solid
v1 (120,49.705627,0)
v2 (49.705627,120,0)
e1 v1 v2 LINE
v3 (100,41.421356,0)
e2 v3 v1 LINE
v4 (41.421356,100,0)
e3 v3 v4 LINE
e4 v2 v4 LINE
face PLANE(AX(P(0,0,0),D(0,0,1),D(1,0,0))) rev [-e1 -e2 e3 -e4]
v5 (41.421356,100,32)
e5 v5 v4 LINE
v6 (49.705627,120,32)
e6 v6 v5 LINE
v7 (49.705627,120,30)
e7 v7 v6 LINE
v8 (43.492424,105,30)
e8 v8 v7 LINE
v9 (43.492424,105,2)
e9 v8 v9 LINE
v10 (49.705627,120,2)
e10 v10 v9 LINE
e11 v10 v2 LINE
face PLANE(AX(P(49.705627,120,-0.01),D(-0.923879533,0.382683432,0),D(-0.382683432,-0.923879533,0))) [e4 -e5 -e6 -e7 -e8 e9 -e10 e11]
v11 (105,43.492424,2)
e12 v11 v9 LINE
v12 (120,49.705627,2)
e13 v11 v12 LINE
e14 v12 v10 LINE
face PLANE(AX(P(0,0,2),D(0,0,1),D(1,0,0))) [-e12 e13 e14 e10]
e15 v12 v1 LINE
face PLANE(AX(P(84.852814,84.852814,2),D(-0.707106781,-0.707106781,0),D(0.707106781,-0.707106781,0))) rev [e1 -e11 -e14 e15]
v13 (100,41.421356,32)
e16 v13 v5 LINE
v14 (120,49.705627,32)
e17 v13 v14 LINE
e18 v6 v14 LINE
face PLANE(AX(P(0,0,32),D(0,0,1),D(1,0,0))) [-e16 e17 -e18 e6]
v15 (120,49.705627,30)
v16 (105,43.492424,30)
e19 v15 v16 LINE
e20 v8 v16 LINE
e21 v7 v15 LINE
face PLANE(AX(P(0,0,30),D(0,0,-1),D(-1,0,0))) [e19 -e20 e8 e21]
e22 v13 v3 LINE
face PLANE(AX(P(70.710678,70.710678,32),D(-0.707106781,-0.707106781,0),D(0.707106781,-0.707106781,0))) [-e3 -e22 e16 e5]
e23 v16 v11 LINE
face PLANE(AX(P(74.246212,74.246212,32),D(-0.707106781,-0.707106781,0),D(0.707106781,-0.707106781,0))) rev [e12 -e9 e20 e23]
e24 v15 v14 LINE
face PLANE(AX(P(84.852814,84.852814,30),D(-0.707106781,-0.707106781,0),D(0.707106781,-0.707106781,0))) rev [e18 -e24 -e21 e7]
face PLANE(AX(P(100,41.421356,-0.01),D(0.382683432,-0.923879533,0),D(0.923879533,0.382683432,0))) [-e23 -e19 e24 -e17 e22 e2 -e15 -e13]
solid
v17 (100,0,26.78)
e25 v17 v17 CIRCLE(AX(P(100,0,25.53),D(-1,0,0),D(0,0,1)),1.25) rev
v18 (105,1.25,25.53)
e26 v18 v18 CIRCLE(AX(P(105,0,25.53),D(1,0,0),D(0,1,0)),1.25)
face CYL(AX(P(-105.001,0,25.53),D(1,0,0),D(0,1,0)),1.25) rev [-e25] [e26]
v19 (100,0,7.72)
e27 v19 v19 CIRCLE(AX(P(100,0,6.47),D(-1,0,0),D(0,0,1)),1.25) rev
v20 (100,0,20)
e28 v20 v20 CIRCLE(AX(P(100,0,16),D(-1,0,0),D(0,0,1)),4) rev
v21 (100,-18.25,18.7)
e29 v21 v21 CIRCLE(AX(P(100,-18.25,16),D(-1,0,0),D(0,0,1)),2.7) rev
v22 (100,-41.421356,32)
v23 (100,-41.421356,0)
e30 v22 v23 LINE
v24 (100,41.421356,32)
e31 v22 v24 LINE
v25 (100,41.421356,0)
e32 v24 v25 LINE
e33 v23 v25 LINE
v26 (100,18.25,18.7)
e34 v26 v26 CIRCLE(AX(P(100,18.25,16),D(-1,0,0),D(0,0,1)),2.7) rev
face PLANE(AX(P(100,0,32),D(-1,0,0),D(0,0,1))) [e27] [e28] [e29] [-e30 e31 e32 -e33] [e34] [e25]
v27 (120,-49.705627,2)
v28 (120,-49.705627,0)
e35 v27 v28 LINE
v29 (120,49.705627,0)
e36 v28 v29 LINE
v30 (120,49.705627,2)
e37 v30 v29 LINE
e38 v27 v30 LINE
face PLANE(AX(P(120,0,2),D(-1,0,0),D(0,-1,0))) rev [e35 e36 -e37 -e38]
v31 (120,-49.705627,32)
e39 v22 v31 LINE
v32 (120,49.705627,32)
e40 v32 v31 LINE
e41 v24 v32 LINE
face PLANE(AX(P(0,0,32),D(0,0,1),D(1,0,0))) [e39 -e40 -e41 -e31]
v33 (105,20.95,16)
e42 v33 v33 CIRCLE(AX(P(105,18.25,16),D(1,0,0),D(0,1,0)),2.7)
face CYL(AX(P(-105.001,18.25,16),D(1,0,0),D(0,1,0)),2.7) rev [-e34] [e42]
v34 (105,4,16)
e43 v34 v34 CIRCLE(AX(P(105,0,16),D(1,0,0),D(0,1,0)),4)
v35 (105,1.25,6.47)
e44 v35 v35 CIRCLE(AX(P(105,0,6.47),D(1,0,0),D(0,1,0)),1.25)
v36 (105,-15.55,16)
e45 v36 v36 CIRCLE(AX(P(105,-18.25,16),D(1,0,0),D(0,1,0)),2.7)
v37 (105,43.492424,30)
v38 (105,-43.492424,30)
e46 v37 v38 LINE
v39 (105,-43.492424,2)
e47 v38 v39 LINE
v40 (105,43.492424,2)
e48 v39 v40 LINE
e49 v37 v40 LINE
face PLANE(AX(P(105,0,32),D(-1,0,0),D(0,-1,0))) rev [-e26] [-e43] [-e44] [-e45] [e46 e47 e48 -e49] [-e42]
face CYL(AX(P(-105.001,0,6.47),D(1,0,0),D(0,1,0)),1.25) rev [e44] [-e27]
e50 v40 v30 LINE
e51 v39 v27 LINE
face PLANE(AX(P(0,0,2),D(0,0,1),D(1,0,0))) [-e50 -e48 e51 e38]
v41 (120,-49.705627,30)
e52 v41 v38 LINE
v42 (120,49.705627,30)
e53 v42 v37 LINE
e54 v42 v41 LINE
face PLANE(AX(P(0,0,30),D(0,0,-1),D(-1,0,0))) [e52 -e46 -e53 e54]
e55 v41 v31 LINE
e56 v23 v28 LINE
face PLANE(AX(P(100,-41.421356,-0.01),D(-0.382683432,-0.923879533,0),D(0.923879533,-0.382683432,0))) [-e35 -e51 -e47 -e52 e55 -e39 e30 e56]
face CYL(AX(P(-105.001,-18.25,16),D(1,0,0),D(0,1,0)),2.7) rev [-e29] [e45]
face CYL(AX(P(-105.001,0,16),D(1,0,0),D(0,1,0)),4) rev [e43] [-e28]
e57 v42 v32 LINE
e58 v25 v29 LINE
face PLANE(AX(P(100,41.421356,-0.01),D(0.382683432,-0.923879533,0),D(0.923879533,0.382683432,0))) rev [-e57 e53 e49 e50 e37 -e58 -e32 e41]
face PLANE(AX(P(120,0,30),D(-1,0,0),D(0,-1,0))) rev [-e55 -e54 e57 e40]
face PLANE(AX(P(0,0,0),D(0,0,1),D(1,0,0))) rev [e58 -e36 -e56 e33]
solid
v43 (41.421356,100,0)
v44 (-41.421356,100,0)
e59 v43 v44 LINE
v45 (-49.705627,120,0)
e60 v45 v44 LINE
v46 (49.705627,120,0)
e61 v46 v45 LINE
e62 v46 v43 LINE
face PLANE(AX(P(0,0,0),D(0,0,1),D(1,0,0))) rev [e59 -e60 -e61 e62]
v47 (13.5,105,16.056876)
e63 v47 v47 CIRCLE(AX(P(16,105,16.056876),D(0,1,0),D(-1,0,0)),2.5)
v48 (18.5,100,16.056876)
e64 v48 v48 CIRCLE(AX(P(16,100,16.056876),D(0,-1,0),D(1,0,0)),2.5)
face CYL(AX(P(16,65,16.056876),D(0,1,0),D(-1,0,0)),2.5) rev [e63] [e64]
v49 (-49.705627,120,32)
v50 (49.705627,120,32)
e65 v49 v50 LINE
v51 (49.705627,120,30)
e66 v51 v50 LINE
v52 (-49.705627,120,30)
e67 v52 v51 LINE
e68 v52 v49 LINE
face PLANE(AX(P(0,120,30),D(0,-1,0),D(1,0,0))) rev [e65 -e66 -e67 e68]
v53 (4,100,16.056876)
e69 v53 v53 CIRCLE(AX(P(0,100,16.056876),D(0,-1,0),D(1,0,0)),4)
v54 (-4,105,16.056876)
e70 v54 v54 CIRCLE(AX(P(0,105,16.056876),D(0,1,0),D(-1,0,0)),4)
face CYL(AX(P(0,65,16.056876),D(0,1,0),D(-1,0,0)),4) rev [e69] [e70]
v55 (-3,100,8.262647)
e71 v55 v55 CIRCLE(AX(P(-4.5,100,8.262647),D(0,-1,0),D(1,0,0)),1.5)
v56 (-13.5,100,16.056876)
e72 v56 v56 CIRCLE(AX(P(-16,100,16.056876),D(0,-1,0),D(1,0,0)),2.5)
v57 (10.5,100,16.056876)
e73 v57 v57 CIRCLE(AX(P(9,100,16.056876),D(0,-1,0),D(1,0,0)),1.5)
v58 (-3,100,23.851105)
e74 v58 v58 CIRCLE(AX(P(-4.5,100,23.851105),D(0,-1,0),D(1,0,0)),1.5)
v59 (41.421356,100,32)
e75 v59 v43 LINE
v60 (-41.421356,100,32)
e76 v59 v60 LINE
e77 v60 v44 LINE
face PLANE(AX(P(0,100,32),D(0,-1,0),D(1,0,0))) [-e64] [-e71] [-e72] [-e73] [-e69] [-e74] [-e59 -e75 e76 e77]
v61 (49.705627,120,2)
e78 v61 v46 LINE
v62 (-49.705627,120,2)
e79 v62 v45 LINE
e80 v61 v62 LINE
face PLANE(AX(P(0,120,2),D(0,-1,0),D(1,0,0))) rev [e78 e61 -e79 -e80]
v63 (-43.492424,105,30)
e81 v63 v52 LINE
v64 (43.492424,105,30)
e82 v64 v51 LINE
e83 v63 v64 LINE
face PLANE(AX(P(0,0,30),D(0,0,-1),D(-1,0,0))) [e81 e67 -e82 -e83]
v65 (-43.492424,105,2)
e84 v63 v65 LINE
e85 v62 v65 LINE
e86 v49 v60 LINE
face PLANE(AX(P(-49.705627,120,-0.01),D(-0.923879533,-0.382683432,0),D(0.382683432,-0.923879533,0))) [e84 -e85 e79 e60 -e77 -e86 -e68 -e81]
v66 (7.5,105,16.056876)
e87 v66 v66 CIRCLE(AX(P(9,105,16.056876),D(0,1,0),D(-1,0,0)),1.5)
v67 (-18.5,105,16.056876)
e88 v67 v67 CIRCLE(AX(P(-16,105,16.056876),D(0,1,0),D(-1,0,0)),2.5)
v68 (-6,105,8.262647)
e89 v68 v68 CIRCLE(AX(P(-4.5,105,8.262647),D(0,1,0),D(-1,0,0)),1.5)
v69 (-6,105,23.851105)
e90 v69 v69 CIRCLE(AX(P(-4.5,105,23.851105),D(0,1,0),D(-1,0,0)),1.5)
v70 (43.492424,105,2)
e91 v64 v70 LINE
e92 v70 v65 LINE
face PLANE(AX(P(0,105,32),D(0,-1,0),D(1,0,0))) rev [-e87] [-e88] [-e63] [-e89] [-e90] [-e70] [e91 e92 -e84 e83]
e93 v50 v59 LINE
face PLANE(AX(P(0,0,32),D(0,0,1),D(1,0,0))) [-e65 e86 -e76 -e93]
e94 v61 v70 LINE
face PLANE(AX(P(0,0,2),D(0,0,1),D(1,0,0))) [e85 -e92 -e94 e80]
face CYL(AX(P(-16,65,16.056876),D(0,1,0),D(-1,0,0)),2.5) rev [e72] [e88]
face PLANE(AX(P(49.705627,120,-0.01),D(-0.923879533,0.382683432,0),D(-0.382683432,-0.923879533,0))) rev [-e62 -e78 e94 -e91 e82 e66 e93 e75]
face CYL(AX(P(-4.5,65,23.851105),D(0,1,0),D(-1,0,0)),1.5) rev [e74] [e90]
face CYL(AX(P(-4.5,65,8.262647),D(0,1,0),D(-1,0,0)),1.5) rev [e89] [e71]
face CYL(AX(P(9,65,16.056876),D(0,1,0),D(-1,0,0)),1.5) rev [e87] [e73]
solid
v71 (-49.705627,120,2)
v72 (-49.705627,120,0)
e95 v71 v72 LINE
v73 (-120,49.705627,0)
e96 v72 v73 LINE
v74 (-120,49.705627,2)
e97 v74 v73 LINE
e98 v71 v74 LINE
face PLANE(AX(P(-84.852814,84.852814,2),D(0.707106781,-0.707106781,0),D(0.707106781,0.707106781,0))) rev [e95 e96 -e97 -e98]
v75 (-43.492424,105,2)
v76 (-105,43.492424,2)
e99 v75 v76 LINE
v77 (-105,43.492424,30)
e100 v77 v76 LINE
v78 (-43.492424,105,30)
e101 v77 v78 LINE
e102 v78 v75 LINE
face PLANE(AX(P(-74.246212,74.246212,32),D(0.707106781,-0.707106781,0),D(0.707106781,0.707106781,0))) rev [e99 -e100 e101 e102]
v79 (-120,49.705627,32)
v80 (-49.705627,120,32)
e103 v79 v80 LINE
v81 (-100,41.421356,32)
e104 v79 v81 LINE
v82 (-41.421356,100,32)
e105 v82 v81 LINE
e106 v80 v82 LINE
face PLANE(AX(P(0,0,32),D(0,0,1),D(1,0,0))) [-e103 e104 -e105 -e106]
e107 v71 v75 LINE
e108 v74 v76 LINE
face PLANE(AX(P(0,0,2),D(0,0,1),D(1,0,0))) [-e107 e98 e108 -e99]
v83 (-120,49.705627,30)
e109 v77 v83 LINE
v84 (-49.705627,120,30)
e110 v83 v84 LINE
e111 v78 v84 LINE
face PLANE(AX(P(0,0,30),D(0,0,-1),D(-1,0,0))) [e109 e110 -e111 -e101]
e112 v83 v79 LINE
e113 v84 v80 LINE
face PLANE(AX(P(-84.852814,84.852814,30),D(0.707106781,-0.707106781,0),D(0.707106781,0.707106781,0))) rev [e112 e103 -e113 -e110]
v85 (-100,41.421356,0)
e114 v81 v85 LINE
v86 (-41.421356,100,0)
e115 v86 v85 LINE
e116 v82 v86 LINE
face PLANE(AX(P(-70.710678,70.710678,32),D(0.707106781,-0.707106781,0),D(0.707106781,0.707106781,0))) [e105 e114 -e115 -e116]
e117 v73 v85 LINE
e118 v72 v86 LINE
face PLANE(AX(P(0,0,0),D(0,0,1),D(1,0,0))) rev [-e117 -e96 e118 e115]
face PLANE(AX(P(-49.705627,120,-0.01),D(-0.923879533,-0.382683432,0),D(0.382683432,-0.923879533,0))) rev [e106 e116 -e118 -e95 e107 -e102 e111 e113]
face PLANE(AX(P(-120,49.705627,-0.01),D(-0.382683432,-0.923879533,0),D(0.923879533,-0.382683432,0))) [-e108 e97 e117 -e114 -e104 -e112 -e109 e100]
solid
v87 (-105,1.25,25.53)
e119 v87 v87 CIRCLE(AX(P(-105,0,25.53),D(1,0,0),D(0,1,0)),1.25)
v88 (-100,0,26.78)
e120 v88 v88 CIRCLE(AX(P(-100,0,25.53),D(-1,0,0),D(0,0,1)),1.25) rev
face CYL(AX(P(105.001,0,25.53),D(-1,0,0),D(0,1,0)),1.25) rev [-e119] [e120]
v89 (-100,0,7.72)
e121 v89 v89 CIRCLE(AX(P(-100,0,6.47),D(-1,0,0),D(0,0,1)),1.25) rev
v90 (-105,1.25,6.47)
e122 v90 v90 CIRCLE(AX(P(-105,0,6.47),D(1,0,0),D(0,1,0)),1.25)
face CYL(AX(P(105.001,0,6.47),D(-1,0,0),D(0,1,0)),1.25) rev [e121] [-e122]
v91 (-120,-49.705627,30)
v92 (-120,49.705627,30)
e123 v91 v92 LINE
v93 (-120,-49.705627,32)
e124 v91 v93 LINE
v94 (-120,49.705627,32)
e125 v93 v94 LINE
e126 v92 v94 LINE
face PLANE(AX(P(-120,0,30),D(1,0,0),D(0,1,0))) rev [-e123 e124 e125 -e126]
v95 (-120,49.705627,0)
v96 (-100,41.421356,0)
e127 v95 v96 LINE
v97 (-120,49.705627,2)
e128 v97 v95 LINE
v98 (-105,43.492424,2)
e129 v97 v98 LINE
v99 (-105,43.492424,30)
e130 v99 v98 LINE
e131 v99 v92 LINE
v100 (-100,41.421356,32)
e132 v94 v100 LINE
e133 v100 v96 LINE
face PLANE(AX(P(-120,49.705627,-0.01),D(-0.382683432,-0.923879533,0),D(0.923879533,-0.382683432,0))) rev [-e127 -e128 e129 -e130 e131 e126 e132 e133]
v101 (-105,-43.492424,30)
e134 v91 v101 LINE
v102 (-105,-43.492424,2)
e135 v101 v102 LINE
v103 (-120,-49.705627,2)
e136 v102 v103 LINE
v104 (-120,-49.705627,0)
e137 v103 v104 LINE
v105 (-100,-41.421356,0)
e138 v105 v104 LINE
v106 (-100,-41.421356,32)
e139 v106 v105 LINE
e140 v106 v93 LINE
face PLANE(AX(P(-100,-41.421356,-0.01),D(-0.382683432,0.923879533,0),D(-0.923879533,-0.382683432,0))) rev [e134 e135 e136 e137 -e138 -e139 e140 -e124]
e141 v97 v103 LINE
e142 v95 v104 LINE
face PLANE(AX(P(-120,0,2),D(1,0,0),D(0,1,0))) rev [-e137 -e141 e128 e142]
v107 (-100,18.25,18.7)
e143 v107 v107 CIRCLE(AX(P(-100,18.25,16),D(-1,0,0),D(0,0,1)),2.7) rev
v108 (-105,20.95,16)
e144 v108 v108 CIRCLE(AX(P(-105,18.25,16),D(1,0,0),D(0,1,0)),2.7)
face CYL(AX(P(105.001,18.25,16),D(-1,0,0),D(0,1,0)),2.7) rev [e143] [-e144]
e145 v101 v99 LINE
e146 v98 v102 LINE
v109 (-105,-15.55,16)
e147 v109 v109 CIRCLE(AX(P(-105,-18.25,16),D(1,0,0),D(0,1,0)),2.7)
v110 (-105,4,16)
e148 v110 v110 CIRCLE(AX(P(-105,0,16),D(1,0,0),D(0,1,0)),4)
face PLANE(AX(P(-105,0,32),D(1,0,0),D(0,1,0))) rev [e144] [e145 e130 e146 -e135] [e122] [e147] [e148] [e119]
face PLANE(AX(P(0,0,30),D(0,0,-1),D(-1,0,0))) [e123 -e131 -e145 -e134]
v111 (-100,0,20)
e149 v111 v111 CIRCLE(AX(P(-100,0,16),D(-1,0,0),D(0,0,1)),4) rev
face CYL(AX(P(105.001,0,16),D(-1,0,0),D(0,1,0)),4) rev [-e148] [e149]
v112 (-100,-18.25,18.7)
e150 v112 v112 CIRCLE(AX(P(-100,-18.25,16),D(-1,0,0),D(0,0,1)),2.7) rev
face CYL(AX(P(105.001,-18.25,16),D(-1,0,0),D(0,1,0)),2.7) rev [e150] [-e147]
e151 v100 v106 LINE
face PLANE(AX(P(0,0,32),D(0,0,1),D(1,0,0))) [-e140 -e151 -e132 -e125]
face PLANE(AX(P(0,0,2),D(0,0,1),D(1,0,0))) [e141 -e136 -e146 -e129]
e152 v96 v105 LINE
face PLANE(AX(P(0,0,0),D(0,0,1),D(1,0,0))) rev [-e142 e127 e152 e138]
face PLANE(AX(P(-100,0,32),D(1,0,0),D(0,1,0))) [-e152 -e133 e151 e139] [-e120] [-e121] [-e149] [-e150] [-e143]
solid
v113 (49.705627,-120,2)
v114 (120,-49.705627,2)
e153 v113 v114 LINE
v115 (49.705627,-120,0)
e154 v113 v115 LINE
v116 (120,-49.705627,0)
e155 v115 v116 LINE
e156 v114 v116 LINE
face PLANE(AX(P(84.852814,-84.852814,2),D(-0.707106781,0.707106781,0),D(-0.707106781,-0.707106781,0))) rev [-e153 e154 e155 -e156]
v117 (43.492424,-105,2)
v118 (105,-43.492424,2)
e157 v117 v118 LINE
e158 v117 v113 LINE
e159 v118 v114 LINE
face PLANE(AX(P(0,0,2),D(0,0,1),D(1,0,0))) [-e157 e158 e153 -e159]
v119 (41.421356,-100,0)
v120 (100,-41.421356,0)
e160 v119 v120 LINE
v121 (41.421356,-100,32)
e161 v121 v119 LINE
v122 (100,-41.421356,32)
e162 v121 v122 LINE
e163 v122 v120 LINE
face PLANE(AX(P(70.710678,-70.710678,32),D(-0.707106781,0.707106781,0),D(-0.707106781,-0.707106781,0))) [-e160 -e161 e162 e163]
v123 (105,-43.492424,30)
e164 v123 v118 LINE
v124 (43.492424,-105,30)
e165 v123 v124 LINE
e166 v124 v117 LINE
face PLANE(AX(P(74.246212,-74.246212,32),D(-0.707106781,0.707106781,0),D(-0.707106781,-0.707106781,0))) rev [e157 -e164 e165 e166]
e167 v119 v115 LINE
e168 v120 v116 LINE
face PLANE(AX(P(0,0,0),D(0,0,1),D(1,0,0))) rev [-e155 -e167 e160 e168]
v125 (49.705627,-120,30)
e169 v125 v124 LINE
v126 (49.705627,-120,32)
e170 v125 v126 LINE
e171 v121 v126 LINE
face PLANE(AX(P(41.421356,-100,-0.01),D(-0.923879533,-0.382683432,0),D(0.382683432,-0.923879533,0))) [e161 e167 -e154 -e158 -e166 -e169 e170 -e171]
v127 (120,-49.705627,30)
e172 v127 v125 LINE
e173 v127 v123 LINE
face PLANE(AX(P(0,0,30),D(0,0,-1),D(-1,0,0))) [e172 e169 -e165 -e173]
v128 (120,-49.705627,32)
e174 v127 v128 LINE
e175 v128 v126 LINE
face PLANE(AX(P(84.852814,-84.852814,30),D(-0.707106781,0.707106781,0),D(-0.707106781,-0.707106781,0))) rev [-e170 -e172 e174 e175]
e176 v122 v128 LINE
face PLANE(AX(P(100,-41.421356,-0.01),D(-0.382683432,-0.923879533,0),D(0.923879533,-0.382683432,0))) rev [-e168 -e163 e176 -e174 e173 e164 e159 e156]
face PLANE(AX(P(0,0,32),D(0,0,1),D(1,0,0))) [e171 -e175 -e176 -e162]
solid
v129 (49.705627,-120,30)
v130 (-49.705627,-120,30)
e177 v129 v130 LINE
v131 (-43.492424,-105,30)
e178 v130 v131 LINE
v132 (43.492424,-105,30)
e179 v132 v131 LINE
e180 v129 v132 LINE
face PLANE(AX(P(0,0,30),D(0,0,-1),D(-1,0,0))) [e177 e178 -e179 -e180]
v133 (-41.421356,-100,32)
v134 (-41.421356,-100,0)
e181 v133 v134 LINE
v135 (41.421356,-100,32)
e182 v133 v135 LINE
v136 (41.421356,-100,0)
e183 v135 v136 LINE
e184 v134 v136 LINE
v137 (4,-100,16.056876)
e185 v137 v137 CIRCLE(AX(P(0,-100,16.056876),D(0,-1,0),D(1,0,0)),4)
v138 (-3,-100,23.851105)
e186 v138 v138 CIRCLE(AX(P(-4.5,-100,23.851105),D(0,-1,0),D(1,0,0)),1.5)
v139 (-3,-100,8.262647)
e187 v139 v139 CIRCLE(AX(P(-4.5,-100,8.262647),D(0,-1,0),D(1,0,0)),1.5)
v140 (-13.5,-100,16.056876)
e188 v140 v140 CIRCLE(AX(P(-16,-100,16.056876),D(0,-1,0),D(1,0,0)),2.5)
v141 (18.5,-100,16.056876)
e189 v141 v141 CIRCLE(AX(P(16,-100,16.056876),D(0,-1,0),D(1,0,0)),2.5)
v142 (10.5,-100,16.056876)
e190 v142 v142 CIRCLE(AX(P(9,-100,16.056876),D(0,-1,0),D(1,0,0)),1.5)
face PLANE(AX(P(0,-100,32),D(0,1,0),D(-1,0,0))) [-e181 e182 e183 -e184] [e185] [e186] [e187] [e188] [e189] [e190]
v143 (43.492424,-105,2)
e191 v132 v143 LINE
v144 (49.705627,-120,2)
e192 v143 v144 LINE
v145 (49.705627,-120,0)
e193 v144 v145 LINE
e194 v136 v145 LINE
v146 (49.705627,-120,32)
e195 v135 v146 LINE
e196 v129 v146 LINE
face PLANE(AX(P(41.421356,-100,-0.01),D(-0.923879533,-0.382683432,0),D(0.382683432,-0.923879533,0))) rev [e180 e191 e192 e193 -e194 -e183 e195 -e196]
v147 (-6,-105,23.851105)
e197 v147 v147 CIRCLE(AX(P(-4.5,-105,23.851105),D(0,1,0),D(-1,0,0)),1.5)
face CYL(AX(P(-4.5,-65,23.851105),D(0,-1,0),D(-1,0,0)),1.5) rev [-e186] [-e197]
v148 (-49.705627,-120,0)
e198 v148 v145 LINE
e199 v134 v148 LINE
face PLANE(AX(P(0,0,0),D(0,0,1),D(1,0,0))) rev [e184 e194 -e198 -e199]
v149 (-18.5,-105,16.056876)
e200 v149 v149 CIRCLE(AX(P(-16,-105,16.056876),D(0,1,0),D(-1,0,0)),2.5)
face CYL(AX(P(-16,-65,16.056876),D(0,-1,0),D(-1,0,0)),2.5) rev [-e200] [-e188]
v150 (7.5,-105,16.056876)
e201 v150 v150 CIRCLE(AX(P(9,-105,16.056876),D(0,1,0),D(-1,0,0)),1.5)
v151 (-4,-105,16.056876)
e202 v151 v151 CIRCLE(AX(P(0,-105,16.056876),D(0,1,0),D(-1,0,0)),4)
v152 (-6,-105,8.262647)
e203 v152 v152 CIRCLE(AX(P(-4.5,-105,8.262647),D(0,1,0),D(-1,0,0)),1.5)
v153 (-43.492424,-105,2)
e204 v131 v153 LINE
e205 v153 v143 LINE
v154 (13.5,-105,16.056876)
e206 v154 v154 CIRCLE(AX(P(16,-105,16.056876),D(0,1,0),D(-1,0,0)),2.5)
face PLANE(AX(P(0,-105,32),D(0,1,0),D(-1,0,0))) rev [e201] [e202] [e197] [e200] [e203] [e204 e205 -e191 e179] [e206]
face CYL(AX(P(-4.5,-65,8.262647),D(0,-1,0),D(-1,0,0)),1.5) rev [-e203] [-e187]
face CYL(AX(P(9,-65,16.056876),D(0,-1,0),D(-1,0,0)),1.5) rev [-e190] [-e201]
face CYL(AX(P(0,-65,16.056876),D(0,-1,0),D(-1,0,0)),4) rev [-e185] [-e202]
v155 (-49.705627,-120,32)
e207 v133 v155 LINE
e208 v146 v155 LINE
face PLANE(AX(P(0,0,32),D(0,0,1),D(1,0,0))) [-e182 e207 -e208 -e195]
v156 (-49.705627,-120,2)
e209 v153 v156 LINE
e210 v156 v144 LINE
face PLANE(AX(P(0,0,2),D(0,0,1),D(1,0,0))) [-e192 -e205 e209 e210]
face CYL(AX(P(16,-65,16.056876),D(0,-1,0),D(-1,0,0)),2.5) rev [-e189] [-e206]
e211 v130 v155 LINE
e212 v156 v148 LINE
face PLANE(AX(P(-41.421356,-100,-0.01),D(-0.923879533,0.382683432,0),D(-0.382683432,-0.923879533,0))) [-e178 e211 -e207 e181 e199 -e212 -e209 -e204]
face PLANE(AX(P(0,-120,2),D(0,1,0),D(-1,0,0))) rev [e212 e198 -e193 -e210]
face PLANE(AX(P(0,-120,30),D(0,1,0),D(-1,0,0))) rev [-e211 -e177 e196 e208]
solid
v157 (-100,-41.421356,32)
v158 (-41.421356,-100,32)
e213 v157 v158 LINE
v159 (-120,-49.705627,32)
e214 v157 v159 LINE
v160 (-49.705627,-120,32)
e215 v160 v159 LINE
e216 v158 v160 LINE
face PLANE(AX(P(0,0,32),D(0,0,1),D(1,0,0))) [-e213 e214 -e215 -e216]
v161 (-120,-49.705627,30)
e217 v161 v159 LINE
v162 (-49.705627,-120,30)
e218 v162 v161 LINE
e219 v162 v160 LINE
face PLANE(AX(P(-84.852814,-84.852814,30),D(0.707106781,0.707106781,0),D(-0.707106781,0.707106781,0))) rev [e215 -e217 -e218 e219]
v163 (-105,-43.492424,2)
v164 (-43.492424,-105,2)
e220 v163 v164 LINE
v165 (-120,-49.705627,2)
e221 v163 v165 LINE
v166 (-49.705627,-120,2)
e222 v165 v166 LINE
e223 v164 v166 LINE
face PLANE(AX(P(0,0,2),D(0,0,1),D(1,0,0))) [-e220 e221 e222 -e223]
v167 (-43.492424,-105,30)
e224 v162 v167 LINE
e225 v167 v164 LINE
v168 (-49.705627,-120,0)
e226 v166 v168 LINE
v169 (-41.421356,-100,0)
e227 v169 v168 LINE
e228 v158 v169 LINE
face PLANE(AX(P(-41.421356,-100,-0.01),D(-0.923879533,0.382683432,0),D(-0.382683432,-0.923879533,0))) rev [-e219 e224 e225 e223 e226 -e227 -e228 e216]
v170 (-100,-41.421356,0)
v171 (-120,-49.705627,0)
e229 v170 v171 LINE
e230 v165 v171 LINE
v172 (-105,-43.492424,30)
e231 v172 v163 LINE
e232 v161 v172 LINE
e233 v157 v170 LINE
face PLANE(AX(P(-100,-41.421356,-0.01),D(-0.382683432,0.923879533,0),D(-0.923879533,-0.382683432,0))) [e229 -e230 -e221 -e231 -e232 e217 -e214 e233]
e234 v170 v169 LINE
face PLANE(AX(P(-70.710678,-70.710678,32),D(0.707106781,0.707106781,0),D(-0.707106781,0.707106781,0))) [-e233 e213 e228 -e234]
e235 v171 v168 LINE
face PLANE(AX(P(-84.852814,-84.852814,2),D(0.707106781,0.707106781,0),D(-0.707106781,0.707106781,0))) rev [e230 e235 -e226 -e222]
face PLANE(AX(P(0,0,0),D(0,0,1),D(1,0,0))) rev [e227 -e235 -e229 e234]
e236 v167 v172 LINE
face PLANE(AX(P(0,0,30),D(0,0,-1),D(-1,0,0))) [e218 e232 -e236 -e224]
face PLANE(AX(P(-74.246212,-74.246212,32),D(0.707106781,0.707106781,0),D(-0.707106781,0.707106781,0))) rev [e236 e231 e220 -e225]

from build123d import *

# Parameters (mm, degrees)
RESSALTO_EXTRUS_O1_DEPTH = 32
CORTE_EXTRUS_O1_REACH    = 238.958
ESBO_O2_R                = 4
ESBO_O2_R_2              = 2.7
ESBO_O2_R_3              = 1.25
ESBO_O4_R                = 4
ESBO_O4_R_2              = 1.5
ESBO_O4_R_3              = 2.5
CORTE_EXTRUS_O8_DEPTH    = 40
RESSALTO_EXTRUS_O2_DEPTH = 2
RESSALTO_EXTRUS_O3_START = 32
RESSALTO_EXTRUS_O3_DEPTH = 2
DIVIDIR1_DEPTH           = 32
DIVIDIR1_2_DEPTH         = 2
DIVIDIR1_START           = 30
DIVIDIR1_3_DEPTH         = 2
DIVIDIR1_4_DEPTH         = 32
DIVIDIR1_5_DEPTH         = 32
DIVIDIR1_6_DEPTH         = 2
DIVIDIR1_7_DEPTH         = 2
DIVIDIR1_8_DEPTH         = 32
DIVIDIR1_9_DEPTH         = 2
DIVIDIR1_10_DEPTH        = 2
DIVIDIR1_START_2         = -105
DIVIDIR1_11_OUTLINE_R    = 2.5
DIVIDIR1_11_OUTLINE_R_2  = 4
DIVIDIR1_11_OUTLINE_R_3  = 1.5
DIVIDIR1_11_DEPTH        = 5
DIVIDIR1_12_DEPTH        = 32
DIVIDIR1_13_DEPTH        = 2
DIVIDIR1_14_DEPTH        = 2
DIVIDIR1_15_DEPTH        = 32
DIVIDIR1_16_DEPTH        = 2
DIVIDIR1_17_DEPTH        = 2
DIVIDIR1_START_3         = 100
DIVIDIR1_18_OUTLINE_R    = 2.7
DIVIDIR1_18_OUTLINE_R_2  = 1.25
DIVIDIR1_18_OUTLINE_R_3  = 4
DIVIDIR1_18_DEPTH        = 5
DIVIDIR1_19_DEPTH        = 32
DIVIDIR1_20_DEPTH        = 2
DIVIDIR1_21_DEPTH        = 2
DIVIDIR1_22_OUTLINE_R    = 4
DIVIDIR1_22_OUTLINE_R_2  = 2.5
DIVIDIR1_22_OUTLINE_R_3  = 1.5
DIVIDIR1_22_DEPTH        = 5
DIVIDIR1_23_DEPTH        = 32
DIVIDIR1_24_DEPTH        = 2
DIVIDIR1_25_DEPTH        = 2


with BuildPart() as part:
    # Esboço1 → Ressalto-extrusão1 (new body)
    with BuildSketch(Plane.XY):
        Polygon((43.492424049, -105), (105, -43.492424049), (105, 43.492424049), (43.492424049, 105), (-43.492424049, 105), (-105, 43.492424049), (-105, -43.492424049), (-43.492424049, -105), align=None)
        Polygon((100, -41.421356237), (100, 41.421356237), (41.421356237, 100), (-41.421356237, 100), (-100, 41.421356237), (-100, -41.421356237), (-41.421356237, -100), (41.421356237, -100), align=None, mode=Mode.SUBTRACT)
    extrude(amount=RESSALTO_EXTRUS_O1_DEPTH)

    # Esboço2 → Corte-extrusão1 (cut, up to next)
    with BuildSketch(Plane(origin=(105, 0, 0), x_dir=(0, 0, -1), z_dir=(1, 0, 0)), mode=Mode.PRIVATE) as corte_extrus_o1_sk1:
        with Locations(Location((-16, 0, 0), (0, 0, 90))):
            Circle(ESBO_O2_R)
    corte_extrus_o1_tool1 = extrude(corte_extrus_o1_sk1.sketch, amount=-CORTE_EXTRUS_O1_REACH, mode=Mode.PRIVATE) & part.part
    # Esboço2 → Corte-extrusão1 (cut, up to next)
    with BuildSketch(Plane(origin=(105, 0, 0), x_dir=(0, 0, -1), z_dir=(1, 0, 0)), mode=Mode.PRIVATE) as corte_extrus_o1_sk2:
        with Locations(Location((-16, 18.25, 0), (0, 0, 90))):
            Circle(ESBO_O2_R_2)
    corte_extrus_o1_tool2 = extrude(corte_extrus_o1_sk2.sketch, amount=-CORTE_EXTRUS_O1_REACH, mode=Mode.PRIVATE) & part.part
    # Esboço2 → Corte-extrusão1 (cut, up to next)
    with BuildSketch(Plane(origin=(105, 0, 0), x_dir=(0, 0, -1), z_dir=(1, 0, 0)), mode=Mode.PRIVATE) as corte_extrus_o1_sk3:
        with Locations(Location((-16, -18.25, 0), (0, 0, 90))):
            Circle(ESBO_O2_R_2)
    corte_extrus_o1_tool3 = extrude(corte_extrus_o1_sk3.sketch, amount=-CORTE_EXTRUS_O1_REACH, mode=Mode.PRIVATE) & part.part
    # Esboço2 → Corte-extrusão1 (cut, up to next)
    with BuildSketch(Plane(origin=(105, 0, 0), x_dir=(0, 0, -1), z_dir=(1, 0, 0)), mode=Mode.PRIVATE) as corte_extrus_o1_sk4:
        with Locations(Location((-6.47, 0, 0), (0, 0, 90))):
            Circle(ESBO_O2_R_3)
    corte_extrus_o1_tool4 = extrude(corte_extrus_o1_sk4.sketch, amount=-CORTE_EXTRUS_O1_REACH, mode=Mode.PRIVATE) & part.part
    # Esboço2 → Corte-extrusão1 (cut, up to next)
    with BuildSketch(Plane(origin=(105, 0, 0), x_dir=(0, 0, -1), z_dir=(1, 0, 0)), mode=Mode.PRIVATE) as corte_extrus_o1_sk5:
        with Locations(Location((-25.53, 0, 0), (0, 0, 90))):
            Circle(ESBO_O2_R_3)
    corte_extrus_o1_tool5 = extrude(corte_extrus_o1_sk5.sketch, amount=-CORTE_EXTRUS_O1_REACH, mode=Mode.PRIVATE) & part.part
    corte_extrus_o1_1 = corte_extrus_o1_tool1.solids().sort_by_distance((105, 0, 16))[0]
    add(corte_extrus_o1_1, mode=Mode.SUBTRACT)
    corte_extrus_o1_2 = corte_extrus_o1_tool2.solids().sort_by_distance((105, 18.25, 16))[0]
    add(corte_extrus_o1_2, mode=Mode.SUBTRACT)
    corte_extrus_o1_3 = corte_extrus_o1_tool3.solids().sort_by_distance((105, -18.25, 16))[0]
    add(corte_extrus_o1_3, mode=Mode.SUBTRACT)
    corte_extrus_o1_4 = corte_extrus_o1_tool4.solids().sort_by_distance((105, 0, 6.47))[0]
    add(corte_extrus_o1_4, mode=Mode.SUBTRACT)
    corte_extrus_o1_5 = corte_extrus_o1_tool5.solids().sort_by_distance((105, 0, 25.53))[0]
    add(corte_extrus_o1_5, mode=Mode.SUBTRACT)
    corte_extrus_o1 = corte_extrus_o1_1 + corte_extrus_o1_2 + corte_extrus_o1_3 + corte_extrus_o1_4 + corte_extrus_o1_5  # Corte-extrusão1 as one shape, for the pattern or mirror that repeats it

    # Esboço4 → Corte-extrusão8 (cut)
    with BuildSketch(Plane(origin=(0, 105, 0), x_dir=(1, 0, 0), z_dir=(0, 1, 0))):
        with Locations(Location((0, -16.056876113, 0), (0, 0, 180))):
            Circle(ESBO_O4_R)
        with Locations(Location((9, -16.056876113, 0), (0, 0, 180))):
            Circle(ESBO_O4_R_2)
        with Locations(Location((-4.5, -23.851104747, 0), (0, 0, 180))):
            Circle(ESBO_O4_R_2)
        with Locations(Location((-4.5, -8.262647479, 0), (0, 0, 180))):
            Circle(ESBO_O4_R_2)
        with Locations(Location((-16, -16.056876113, 0), (0, 0, 180))):
            Circle(ESBO_O4_R_3)
        with Locations(Location((16, -16.056876113, 0), (0, 0, 180))):
            Circle(ESBO_O4_R_3)
    corte_extrus_o8 = extrude(amount=-CORTE_EXTRUS_O8_DEPTH, mode=Mode.SUBTRACT)

    # Espelhar11: Corte-extrusão8 across plane
    add(corte_extrus_o8.mirror(Plane.ZX), mode=Mode.SUBTRACT)

    # Esboço1<3> → Ressalto-extrusão2 (add)
    with BuildSketch(Plane.XY):
        Polygon((49.705627485, -120), (120, -49.705627485), (120, 49.705627485), (49.705627485, 120), (-49.705627485, 120), (-120, 49.705627485), (-120, -49.705627485), (-49.705627485, -120), align=None)
        Polygon((105, -43.492424049), (105, 43.492424049), (43.492424049, 105), (-43.492424049, 105), (-105, 43.492424049), (-105, -43.492424049), (-43.492424049, -105), (43.492424049, -105), align=None, mode=Mode.SUBTRACT)
    extrude(amount=RESSALTO_EXTRUS_O2_DEPTH)

    # Esboço1<4> → Ressalto-extrusão3 (add)
    with BuildSketch(Plane.XY.offset(RESSALTO_EXTRUS_O3_START)):
        Polygon((49.705627485, -120), (120, -49.705627485), (120, 49.705627485), (49.705627485, 120), (-49.705627485, 120), (-120, 49.705627485), (-120, -49.705627485), (-49.705627485, -120), align=None)
        Polygon((105, -43.492424049), (105, 43.492424049), (43.492424049, 105), (-43.492424049, 105), (-105, 43.492424049), (-105, -43.492424049), (-43.492424049, -105), (43.492424049, -105), align=None, mode=Mode.SUBTRACT)
    extrude(amount=-RESSALTO_EXTRUS_O3_DEPTH)

    # Dividir1 4 outline → Dividir1 4 (cut)
    with BuildSketch(Plane.XY):
        Polygon((-41.421356237, -100), (-100, -41.421356237), (-120, -49.705627485), (-49.705627485, -120), (49.705627485, -120), (120, -49.705627485), (120, 49.705627485), (49.705627485, 120), (-49.705627485, 120), (-120, 49.705627485), (-100, 41.421356237), (-41.421356237, 100), (41.421356237, 100), (100, 41.421356237), (100, -41.421356237), (41.421356237, -100), align=None)
    extrude(amount=DIVIDIR1_4_DEPTH, mode=Mode.SUBTRACT)

    # Espelhar12: Corte-extrusão1 across plane
    add(corte_extrus_o1.mirror(Plane.ZY), mode=Mode.SUBTRACT)


with BuildPart() as body_2:
    # Dividir1: read off the stored shape, not the designer's step
    # Dividir1 outline → Dividir1 (new body)
    with BuildSketch(Plane.XY):
        Polygon((105, 43.492424049), (43.492424049, 105), (41.421356237, 100), (100, 41.421356237), align=None)
    extrude(amount=DIVIDIR1_DEPTH)

    # Dividir1 2 outline → Dividir1 2 (add)
    with BuildSketch(Plane.XY):
        Polygon((120, 49.705627485), (49.705627485, 120), (43.492424049, 105), (105, 43.492424049), align=None)
    extrude(amount=DIVIDIR1_2_DEPTH)

    # Dividir1 3 outline → Dividir1 3 (add)
    with BuildSketch(Plane.XY.offset(DIVIDIR1_START)):
        Polygon((120, 49.705627485), (49.705627485, 120), (43.492424049, 105), (105, 43.492424049), align=None)
    extrude(amount=DIVIDIR1_3_DEPTH)


with BuildPart() as body_3:
    # Dividir1 5 outline → Dividir1 5 (new body)
    with BuildSketch(Plane.XY):
        Polygon((-43.492424049, -105), (-41.421356237, -100), (-100, -41.421356237), (-105, -43.492424049), align=None)
    extrude(amount=DIVIDIR1_5_DEPTH)

    # Dividir1 6 outline → Dividir1 6 (add)
    with BuildSketch(Plane.XY):
        Polygon((-49.705627485, -120), (-43.492424049, -105), (-105, -43.492424049), (-120, -49.705627485), align=None)
    extrude(amount=DIVIDIR1_6_DEPTH)

    # Dividir1 7 outline → Dividir1 7 (add)
    with BuildSketch(Plane.XY.offset(DIVIDIR1_START)):
        Polygon((-49.705627485, -120), (-43.492424049, -105), (-105, -43.492424049), (-120, -49.705627485), align=None)
    extrude(amount=DIVIDIR1_7_DEPTH)


with BuildPart() as body_4:
    # Dividir1 8 outline → Dividir1 8 (new body)
    with BuildSketch(Plane.XY):
        Polygon((43.492424049, -105), (41.421356237, -100), (-41.421356237, -100), (-43.492424049, -105), align=None)
    extrude(amount=DIVIDIR1_8_DEPTH)

    # Dividir1 9 outline → Dividir1 9 (add)
    with BuildSketch(Plane.XY):
        Polygon((49.705627485, -120), (43.492424049, -105), (-43.492424049, -105), (-49.705627485, -120), align=None)
    extrude(amount=DIVIDIR1_9_DEPTH)

    # Dividir1 10 outline → Dividir1 10 (add)
    with BuildSketch(Plane.XY.offset(DIVIDIR1_START)):
        Polygon((49.705627485, -120), (43.492424049, -105), (-43.492424049, -105), (-49.705627485, -120), align=None)
    extrude(amount=DIVIDIR1_10_DEPTH)

    # Dividir1 11 outline → Dividir1 11 (cut)
    with BuildSketch(Plane(origin=(0, 0, 0), x_dir=(1, 0, 0), z_dir=(0, 1, 0)).offset(DIVIDIR1_START_2)):
        with Locations((16, -16.056876113)):
            Circle(DIVIDIR1_11_OUTLINE_R)
        with Locations((0, -16.056876113)):
            Circle(DIVIDIR1_11_OUTLINE_R_2)
        with Locations((-16, -16.056876113)):
            Circle(DIVIDIR1_11_OUTLINE_R)
        with Locations((-4.5, -23.851104747)):
            Circle(DIVIDIR1_11_OUTLINE_R_3)
        with Locations((9, -16.056876113)):
            Circle(DIVIDIR1_11_OUTLINE_R_3)
        with Locations((-4.5, -8.262647479)):
            Circle(DIVIDIR1_11_OUTLINE_R_3)
    extrude(amount=DIVIDIR1_11_DEPTH, mode=Mode.SUBTRACT)


with BuildPart() as body_5:
    # Dividir1 12 outline → Dividir1 12 (new body)
    with BuildSketch(Plane.XY):
        Polygon((105, -43.492424049), (100, -41.421356237), (41.421356237, -100), (43.492424049, -105), align=None)
    extrude(amount=DIVIDIR1_12_DEPTH)

    # Dividir1 13 outline → Dividir1 13 (add)
    with BuildSketch(Plane.XY):
        Polygon((120, -49.705627485), (105, -43.492424049), (43.492424049, -105), (49.705627485, -120), align=None)
    extrude(amount=DIVIDIR1_13_DEPTH)

    # Dividir1 14 outline → Dividir1 14 (add)
    with BuildSketch(Plane.XY.offset(DIVIDIR1_START)):
        Polygon((120, -49.705627485), (105, -43.492424049), (43.492424049, -105), (49.705627485, -120), align=None)
    extrude(amount=DIVIDIR1_14_DEPTH)


with BuildPart() as body_6:
    # Dividir1 15 outline → Dividir1 15 (new body)
    with BuildSketch(Plane.XY):
        Polygon((105, 43.492424049), (100, 41.421356237), (100, -41.421356237), (105, -43.492424049), align=None)
    extrude(amount=DIVIDIR1_15_DEPTH)

    # Dividir1 16 outline → Dividir1 16 (add)
    with BuildSketch(Plane.XY):
        Polygon((120, 49.705627485), (105, 43.492424049), (105, -43.492424049), (120, -49.705627485), align=None)
    extrude(amount=DIVIDIR1_16_DEPTH)

    # Dividir1 17 outline → Dividir1 17 (add)
    with BuildSketch(Plane.XY.offset(DIVIDIR1_START)):
        Polygon((120, 49.705627485), (105, 43.492424049), (105, -43.492424049), (120, -49.705627485), align=None)
    extrude(amount=DIVIDIR1_17_DEPTH)

    # Dividir1 18 outline → Dividir1 18 (cut)
    with BuildSketch(Plane.YZ.offset(DIVIDIR1_START_3)):
        with Locations((-18.25, 16)):
            Circle(DIVIDIR1_18_OUTLINE_R)
        with Locations((0, 25.53)):
            Circle(DIVIDIR1_18_OUTLINE_R_2)
        with Locations((0, 6.47)):
            Circle(DIVIDIR1_18_OUTLINE_R_2)
        with Locations((0, 16)):
            Circle(DIVIDIR1_18_OUTLINE_R_3)
        with Locations((18.25, 16)):
            Circle(DIVIDIR1_18_OUTLINE_R)
    extrude(amount=DIVIDIR1_18_DEPTH, mode=Mode.SUBTRACT)


with BuildPart() as body_7:
    # Dividir1 19 outline → Dividir1 19 (new body)
    with BuildSketch(Plane.XY):
        Polygon((41.421356237, 100), (43.492424049, 105), (-43.492424049, 105), (-41.421356237, 100), align=None)
    extrude(amount=DIVIDIR1_19_DEPTH)

    # Dividir1 20 outline → Dividir1 20 (add)
    with BuildSketch(Plane.XY):
        Polygon((43.492424049, 105), (49.705627485, 120), (-49.705627485, 120), (-43.492424049, 105), align=None)
    extrude(amount=DIVIDIR1_20_DEPTH)

    # Dividir1 21 outline → Dividir1 21 (add)
    with BuildSketch(Plane.XY.offset(DIVIDIR1_START)):
        Polygon((43.492424049, 105), (49.705627485, 120), (-49.705627485, 120), (-43.492424049, 105), align=None)
    extrude(amount=DIVIDIR1_21_DEPTH)

    # Dividir1 22 outline → Dividir1 22 (cut)
    with BuildSketch(Plane(origin=(0, 0, 0), x_dir=(1, 0, 0), z_dir=(0, 1, 0)).offset(DIVIDIR1_START_3)):
        with Locations((0, -16.056876113)):
            Circle(DIVIDIR1_22_OUTLINE_R)
        with Locations((-16, -16.056876113)):
            Circle(DIVIDIR1_22_OUTLINE_R_2)
        with Locations((-4.5, -23.851104747)):
            Circle(DIVIDIR1_22_OUTLINE_R_3)
        with Locations((9, -16.056876113)):
            Circle(DIVIDIR1_22_OUTLINE_R_3)
        with Locations((-4.5, -8.262647479)):
            Circle(DIVIDIR1_22_OUTLINE_R_3)
        with Locations((16, -16.056876113)):
            Circle(DIVIDIR1_22_OUTLINE_R_2)
    extrude(amount=DIVIDIR1_22_DEPTH, mode=Mode.SUBTRACT)


with BuildPart() as body_8:
    # Dividir1 23 outline → Dividir1 23 (new body)
    with BuildSketch(Plane.XY):
        Polygon((-41.421356237, 100), (-43.492424049, 105), (-105, 43.492424049), (-100, 41.421356237), align=None)
    extrude(amount=DIVIDIR1_23_DEPTH)

    # Dividir1 24 outline → Dividir1 24 (add)
    with BuildSketch(Plane.XY):
        Polygon((-43.492424049, 105), (-49.705627485, 120), (-120, 49.705627485), (-105, 43.492424049), align=None)
    extrude(amount=DIVIDIR1_24_DEPTH)

    # Dividir1 25 outline → Dividir1 25 (add)
    with BuildSketch(Plane.XY.offset(DIVIDIR1_START)):
        Polygon((-43.492424049, 105), (-49.705627485, 120), (-120, 49.705627485), (-105, 43.492424049), align=None)
    extrude(amount=DIVIDIR1_25_DEPTH)


solid = Compound([part.part, body_2.part, body_3.part, body_4.part, body_5.part, body_6.part, body_7.part, body_8.part])
